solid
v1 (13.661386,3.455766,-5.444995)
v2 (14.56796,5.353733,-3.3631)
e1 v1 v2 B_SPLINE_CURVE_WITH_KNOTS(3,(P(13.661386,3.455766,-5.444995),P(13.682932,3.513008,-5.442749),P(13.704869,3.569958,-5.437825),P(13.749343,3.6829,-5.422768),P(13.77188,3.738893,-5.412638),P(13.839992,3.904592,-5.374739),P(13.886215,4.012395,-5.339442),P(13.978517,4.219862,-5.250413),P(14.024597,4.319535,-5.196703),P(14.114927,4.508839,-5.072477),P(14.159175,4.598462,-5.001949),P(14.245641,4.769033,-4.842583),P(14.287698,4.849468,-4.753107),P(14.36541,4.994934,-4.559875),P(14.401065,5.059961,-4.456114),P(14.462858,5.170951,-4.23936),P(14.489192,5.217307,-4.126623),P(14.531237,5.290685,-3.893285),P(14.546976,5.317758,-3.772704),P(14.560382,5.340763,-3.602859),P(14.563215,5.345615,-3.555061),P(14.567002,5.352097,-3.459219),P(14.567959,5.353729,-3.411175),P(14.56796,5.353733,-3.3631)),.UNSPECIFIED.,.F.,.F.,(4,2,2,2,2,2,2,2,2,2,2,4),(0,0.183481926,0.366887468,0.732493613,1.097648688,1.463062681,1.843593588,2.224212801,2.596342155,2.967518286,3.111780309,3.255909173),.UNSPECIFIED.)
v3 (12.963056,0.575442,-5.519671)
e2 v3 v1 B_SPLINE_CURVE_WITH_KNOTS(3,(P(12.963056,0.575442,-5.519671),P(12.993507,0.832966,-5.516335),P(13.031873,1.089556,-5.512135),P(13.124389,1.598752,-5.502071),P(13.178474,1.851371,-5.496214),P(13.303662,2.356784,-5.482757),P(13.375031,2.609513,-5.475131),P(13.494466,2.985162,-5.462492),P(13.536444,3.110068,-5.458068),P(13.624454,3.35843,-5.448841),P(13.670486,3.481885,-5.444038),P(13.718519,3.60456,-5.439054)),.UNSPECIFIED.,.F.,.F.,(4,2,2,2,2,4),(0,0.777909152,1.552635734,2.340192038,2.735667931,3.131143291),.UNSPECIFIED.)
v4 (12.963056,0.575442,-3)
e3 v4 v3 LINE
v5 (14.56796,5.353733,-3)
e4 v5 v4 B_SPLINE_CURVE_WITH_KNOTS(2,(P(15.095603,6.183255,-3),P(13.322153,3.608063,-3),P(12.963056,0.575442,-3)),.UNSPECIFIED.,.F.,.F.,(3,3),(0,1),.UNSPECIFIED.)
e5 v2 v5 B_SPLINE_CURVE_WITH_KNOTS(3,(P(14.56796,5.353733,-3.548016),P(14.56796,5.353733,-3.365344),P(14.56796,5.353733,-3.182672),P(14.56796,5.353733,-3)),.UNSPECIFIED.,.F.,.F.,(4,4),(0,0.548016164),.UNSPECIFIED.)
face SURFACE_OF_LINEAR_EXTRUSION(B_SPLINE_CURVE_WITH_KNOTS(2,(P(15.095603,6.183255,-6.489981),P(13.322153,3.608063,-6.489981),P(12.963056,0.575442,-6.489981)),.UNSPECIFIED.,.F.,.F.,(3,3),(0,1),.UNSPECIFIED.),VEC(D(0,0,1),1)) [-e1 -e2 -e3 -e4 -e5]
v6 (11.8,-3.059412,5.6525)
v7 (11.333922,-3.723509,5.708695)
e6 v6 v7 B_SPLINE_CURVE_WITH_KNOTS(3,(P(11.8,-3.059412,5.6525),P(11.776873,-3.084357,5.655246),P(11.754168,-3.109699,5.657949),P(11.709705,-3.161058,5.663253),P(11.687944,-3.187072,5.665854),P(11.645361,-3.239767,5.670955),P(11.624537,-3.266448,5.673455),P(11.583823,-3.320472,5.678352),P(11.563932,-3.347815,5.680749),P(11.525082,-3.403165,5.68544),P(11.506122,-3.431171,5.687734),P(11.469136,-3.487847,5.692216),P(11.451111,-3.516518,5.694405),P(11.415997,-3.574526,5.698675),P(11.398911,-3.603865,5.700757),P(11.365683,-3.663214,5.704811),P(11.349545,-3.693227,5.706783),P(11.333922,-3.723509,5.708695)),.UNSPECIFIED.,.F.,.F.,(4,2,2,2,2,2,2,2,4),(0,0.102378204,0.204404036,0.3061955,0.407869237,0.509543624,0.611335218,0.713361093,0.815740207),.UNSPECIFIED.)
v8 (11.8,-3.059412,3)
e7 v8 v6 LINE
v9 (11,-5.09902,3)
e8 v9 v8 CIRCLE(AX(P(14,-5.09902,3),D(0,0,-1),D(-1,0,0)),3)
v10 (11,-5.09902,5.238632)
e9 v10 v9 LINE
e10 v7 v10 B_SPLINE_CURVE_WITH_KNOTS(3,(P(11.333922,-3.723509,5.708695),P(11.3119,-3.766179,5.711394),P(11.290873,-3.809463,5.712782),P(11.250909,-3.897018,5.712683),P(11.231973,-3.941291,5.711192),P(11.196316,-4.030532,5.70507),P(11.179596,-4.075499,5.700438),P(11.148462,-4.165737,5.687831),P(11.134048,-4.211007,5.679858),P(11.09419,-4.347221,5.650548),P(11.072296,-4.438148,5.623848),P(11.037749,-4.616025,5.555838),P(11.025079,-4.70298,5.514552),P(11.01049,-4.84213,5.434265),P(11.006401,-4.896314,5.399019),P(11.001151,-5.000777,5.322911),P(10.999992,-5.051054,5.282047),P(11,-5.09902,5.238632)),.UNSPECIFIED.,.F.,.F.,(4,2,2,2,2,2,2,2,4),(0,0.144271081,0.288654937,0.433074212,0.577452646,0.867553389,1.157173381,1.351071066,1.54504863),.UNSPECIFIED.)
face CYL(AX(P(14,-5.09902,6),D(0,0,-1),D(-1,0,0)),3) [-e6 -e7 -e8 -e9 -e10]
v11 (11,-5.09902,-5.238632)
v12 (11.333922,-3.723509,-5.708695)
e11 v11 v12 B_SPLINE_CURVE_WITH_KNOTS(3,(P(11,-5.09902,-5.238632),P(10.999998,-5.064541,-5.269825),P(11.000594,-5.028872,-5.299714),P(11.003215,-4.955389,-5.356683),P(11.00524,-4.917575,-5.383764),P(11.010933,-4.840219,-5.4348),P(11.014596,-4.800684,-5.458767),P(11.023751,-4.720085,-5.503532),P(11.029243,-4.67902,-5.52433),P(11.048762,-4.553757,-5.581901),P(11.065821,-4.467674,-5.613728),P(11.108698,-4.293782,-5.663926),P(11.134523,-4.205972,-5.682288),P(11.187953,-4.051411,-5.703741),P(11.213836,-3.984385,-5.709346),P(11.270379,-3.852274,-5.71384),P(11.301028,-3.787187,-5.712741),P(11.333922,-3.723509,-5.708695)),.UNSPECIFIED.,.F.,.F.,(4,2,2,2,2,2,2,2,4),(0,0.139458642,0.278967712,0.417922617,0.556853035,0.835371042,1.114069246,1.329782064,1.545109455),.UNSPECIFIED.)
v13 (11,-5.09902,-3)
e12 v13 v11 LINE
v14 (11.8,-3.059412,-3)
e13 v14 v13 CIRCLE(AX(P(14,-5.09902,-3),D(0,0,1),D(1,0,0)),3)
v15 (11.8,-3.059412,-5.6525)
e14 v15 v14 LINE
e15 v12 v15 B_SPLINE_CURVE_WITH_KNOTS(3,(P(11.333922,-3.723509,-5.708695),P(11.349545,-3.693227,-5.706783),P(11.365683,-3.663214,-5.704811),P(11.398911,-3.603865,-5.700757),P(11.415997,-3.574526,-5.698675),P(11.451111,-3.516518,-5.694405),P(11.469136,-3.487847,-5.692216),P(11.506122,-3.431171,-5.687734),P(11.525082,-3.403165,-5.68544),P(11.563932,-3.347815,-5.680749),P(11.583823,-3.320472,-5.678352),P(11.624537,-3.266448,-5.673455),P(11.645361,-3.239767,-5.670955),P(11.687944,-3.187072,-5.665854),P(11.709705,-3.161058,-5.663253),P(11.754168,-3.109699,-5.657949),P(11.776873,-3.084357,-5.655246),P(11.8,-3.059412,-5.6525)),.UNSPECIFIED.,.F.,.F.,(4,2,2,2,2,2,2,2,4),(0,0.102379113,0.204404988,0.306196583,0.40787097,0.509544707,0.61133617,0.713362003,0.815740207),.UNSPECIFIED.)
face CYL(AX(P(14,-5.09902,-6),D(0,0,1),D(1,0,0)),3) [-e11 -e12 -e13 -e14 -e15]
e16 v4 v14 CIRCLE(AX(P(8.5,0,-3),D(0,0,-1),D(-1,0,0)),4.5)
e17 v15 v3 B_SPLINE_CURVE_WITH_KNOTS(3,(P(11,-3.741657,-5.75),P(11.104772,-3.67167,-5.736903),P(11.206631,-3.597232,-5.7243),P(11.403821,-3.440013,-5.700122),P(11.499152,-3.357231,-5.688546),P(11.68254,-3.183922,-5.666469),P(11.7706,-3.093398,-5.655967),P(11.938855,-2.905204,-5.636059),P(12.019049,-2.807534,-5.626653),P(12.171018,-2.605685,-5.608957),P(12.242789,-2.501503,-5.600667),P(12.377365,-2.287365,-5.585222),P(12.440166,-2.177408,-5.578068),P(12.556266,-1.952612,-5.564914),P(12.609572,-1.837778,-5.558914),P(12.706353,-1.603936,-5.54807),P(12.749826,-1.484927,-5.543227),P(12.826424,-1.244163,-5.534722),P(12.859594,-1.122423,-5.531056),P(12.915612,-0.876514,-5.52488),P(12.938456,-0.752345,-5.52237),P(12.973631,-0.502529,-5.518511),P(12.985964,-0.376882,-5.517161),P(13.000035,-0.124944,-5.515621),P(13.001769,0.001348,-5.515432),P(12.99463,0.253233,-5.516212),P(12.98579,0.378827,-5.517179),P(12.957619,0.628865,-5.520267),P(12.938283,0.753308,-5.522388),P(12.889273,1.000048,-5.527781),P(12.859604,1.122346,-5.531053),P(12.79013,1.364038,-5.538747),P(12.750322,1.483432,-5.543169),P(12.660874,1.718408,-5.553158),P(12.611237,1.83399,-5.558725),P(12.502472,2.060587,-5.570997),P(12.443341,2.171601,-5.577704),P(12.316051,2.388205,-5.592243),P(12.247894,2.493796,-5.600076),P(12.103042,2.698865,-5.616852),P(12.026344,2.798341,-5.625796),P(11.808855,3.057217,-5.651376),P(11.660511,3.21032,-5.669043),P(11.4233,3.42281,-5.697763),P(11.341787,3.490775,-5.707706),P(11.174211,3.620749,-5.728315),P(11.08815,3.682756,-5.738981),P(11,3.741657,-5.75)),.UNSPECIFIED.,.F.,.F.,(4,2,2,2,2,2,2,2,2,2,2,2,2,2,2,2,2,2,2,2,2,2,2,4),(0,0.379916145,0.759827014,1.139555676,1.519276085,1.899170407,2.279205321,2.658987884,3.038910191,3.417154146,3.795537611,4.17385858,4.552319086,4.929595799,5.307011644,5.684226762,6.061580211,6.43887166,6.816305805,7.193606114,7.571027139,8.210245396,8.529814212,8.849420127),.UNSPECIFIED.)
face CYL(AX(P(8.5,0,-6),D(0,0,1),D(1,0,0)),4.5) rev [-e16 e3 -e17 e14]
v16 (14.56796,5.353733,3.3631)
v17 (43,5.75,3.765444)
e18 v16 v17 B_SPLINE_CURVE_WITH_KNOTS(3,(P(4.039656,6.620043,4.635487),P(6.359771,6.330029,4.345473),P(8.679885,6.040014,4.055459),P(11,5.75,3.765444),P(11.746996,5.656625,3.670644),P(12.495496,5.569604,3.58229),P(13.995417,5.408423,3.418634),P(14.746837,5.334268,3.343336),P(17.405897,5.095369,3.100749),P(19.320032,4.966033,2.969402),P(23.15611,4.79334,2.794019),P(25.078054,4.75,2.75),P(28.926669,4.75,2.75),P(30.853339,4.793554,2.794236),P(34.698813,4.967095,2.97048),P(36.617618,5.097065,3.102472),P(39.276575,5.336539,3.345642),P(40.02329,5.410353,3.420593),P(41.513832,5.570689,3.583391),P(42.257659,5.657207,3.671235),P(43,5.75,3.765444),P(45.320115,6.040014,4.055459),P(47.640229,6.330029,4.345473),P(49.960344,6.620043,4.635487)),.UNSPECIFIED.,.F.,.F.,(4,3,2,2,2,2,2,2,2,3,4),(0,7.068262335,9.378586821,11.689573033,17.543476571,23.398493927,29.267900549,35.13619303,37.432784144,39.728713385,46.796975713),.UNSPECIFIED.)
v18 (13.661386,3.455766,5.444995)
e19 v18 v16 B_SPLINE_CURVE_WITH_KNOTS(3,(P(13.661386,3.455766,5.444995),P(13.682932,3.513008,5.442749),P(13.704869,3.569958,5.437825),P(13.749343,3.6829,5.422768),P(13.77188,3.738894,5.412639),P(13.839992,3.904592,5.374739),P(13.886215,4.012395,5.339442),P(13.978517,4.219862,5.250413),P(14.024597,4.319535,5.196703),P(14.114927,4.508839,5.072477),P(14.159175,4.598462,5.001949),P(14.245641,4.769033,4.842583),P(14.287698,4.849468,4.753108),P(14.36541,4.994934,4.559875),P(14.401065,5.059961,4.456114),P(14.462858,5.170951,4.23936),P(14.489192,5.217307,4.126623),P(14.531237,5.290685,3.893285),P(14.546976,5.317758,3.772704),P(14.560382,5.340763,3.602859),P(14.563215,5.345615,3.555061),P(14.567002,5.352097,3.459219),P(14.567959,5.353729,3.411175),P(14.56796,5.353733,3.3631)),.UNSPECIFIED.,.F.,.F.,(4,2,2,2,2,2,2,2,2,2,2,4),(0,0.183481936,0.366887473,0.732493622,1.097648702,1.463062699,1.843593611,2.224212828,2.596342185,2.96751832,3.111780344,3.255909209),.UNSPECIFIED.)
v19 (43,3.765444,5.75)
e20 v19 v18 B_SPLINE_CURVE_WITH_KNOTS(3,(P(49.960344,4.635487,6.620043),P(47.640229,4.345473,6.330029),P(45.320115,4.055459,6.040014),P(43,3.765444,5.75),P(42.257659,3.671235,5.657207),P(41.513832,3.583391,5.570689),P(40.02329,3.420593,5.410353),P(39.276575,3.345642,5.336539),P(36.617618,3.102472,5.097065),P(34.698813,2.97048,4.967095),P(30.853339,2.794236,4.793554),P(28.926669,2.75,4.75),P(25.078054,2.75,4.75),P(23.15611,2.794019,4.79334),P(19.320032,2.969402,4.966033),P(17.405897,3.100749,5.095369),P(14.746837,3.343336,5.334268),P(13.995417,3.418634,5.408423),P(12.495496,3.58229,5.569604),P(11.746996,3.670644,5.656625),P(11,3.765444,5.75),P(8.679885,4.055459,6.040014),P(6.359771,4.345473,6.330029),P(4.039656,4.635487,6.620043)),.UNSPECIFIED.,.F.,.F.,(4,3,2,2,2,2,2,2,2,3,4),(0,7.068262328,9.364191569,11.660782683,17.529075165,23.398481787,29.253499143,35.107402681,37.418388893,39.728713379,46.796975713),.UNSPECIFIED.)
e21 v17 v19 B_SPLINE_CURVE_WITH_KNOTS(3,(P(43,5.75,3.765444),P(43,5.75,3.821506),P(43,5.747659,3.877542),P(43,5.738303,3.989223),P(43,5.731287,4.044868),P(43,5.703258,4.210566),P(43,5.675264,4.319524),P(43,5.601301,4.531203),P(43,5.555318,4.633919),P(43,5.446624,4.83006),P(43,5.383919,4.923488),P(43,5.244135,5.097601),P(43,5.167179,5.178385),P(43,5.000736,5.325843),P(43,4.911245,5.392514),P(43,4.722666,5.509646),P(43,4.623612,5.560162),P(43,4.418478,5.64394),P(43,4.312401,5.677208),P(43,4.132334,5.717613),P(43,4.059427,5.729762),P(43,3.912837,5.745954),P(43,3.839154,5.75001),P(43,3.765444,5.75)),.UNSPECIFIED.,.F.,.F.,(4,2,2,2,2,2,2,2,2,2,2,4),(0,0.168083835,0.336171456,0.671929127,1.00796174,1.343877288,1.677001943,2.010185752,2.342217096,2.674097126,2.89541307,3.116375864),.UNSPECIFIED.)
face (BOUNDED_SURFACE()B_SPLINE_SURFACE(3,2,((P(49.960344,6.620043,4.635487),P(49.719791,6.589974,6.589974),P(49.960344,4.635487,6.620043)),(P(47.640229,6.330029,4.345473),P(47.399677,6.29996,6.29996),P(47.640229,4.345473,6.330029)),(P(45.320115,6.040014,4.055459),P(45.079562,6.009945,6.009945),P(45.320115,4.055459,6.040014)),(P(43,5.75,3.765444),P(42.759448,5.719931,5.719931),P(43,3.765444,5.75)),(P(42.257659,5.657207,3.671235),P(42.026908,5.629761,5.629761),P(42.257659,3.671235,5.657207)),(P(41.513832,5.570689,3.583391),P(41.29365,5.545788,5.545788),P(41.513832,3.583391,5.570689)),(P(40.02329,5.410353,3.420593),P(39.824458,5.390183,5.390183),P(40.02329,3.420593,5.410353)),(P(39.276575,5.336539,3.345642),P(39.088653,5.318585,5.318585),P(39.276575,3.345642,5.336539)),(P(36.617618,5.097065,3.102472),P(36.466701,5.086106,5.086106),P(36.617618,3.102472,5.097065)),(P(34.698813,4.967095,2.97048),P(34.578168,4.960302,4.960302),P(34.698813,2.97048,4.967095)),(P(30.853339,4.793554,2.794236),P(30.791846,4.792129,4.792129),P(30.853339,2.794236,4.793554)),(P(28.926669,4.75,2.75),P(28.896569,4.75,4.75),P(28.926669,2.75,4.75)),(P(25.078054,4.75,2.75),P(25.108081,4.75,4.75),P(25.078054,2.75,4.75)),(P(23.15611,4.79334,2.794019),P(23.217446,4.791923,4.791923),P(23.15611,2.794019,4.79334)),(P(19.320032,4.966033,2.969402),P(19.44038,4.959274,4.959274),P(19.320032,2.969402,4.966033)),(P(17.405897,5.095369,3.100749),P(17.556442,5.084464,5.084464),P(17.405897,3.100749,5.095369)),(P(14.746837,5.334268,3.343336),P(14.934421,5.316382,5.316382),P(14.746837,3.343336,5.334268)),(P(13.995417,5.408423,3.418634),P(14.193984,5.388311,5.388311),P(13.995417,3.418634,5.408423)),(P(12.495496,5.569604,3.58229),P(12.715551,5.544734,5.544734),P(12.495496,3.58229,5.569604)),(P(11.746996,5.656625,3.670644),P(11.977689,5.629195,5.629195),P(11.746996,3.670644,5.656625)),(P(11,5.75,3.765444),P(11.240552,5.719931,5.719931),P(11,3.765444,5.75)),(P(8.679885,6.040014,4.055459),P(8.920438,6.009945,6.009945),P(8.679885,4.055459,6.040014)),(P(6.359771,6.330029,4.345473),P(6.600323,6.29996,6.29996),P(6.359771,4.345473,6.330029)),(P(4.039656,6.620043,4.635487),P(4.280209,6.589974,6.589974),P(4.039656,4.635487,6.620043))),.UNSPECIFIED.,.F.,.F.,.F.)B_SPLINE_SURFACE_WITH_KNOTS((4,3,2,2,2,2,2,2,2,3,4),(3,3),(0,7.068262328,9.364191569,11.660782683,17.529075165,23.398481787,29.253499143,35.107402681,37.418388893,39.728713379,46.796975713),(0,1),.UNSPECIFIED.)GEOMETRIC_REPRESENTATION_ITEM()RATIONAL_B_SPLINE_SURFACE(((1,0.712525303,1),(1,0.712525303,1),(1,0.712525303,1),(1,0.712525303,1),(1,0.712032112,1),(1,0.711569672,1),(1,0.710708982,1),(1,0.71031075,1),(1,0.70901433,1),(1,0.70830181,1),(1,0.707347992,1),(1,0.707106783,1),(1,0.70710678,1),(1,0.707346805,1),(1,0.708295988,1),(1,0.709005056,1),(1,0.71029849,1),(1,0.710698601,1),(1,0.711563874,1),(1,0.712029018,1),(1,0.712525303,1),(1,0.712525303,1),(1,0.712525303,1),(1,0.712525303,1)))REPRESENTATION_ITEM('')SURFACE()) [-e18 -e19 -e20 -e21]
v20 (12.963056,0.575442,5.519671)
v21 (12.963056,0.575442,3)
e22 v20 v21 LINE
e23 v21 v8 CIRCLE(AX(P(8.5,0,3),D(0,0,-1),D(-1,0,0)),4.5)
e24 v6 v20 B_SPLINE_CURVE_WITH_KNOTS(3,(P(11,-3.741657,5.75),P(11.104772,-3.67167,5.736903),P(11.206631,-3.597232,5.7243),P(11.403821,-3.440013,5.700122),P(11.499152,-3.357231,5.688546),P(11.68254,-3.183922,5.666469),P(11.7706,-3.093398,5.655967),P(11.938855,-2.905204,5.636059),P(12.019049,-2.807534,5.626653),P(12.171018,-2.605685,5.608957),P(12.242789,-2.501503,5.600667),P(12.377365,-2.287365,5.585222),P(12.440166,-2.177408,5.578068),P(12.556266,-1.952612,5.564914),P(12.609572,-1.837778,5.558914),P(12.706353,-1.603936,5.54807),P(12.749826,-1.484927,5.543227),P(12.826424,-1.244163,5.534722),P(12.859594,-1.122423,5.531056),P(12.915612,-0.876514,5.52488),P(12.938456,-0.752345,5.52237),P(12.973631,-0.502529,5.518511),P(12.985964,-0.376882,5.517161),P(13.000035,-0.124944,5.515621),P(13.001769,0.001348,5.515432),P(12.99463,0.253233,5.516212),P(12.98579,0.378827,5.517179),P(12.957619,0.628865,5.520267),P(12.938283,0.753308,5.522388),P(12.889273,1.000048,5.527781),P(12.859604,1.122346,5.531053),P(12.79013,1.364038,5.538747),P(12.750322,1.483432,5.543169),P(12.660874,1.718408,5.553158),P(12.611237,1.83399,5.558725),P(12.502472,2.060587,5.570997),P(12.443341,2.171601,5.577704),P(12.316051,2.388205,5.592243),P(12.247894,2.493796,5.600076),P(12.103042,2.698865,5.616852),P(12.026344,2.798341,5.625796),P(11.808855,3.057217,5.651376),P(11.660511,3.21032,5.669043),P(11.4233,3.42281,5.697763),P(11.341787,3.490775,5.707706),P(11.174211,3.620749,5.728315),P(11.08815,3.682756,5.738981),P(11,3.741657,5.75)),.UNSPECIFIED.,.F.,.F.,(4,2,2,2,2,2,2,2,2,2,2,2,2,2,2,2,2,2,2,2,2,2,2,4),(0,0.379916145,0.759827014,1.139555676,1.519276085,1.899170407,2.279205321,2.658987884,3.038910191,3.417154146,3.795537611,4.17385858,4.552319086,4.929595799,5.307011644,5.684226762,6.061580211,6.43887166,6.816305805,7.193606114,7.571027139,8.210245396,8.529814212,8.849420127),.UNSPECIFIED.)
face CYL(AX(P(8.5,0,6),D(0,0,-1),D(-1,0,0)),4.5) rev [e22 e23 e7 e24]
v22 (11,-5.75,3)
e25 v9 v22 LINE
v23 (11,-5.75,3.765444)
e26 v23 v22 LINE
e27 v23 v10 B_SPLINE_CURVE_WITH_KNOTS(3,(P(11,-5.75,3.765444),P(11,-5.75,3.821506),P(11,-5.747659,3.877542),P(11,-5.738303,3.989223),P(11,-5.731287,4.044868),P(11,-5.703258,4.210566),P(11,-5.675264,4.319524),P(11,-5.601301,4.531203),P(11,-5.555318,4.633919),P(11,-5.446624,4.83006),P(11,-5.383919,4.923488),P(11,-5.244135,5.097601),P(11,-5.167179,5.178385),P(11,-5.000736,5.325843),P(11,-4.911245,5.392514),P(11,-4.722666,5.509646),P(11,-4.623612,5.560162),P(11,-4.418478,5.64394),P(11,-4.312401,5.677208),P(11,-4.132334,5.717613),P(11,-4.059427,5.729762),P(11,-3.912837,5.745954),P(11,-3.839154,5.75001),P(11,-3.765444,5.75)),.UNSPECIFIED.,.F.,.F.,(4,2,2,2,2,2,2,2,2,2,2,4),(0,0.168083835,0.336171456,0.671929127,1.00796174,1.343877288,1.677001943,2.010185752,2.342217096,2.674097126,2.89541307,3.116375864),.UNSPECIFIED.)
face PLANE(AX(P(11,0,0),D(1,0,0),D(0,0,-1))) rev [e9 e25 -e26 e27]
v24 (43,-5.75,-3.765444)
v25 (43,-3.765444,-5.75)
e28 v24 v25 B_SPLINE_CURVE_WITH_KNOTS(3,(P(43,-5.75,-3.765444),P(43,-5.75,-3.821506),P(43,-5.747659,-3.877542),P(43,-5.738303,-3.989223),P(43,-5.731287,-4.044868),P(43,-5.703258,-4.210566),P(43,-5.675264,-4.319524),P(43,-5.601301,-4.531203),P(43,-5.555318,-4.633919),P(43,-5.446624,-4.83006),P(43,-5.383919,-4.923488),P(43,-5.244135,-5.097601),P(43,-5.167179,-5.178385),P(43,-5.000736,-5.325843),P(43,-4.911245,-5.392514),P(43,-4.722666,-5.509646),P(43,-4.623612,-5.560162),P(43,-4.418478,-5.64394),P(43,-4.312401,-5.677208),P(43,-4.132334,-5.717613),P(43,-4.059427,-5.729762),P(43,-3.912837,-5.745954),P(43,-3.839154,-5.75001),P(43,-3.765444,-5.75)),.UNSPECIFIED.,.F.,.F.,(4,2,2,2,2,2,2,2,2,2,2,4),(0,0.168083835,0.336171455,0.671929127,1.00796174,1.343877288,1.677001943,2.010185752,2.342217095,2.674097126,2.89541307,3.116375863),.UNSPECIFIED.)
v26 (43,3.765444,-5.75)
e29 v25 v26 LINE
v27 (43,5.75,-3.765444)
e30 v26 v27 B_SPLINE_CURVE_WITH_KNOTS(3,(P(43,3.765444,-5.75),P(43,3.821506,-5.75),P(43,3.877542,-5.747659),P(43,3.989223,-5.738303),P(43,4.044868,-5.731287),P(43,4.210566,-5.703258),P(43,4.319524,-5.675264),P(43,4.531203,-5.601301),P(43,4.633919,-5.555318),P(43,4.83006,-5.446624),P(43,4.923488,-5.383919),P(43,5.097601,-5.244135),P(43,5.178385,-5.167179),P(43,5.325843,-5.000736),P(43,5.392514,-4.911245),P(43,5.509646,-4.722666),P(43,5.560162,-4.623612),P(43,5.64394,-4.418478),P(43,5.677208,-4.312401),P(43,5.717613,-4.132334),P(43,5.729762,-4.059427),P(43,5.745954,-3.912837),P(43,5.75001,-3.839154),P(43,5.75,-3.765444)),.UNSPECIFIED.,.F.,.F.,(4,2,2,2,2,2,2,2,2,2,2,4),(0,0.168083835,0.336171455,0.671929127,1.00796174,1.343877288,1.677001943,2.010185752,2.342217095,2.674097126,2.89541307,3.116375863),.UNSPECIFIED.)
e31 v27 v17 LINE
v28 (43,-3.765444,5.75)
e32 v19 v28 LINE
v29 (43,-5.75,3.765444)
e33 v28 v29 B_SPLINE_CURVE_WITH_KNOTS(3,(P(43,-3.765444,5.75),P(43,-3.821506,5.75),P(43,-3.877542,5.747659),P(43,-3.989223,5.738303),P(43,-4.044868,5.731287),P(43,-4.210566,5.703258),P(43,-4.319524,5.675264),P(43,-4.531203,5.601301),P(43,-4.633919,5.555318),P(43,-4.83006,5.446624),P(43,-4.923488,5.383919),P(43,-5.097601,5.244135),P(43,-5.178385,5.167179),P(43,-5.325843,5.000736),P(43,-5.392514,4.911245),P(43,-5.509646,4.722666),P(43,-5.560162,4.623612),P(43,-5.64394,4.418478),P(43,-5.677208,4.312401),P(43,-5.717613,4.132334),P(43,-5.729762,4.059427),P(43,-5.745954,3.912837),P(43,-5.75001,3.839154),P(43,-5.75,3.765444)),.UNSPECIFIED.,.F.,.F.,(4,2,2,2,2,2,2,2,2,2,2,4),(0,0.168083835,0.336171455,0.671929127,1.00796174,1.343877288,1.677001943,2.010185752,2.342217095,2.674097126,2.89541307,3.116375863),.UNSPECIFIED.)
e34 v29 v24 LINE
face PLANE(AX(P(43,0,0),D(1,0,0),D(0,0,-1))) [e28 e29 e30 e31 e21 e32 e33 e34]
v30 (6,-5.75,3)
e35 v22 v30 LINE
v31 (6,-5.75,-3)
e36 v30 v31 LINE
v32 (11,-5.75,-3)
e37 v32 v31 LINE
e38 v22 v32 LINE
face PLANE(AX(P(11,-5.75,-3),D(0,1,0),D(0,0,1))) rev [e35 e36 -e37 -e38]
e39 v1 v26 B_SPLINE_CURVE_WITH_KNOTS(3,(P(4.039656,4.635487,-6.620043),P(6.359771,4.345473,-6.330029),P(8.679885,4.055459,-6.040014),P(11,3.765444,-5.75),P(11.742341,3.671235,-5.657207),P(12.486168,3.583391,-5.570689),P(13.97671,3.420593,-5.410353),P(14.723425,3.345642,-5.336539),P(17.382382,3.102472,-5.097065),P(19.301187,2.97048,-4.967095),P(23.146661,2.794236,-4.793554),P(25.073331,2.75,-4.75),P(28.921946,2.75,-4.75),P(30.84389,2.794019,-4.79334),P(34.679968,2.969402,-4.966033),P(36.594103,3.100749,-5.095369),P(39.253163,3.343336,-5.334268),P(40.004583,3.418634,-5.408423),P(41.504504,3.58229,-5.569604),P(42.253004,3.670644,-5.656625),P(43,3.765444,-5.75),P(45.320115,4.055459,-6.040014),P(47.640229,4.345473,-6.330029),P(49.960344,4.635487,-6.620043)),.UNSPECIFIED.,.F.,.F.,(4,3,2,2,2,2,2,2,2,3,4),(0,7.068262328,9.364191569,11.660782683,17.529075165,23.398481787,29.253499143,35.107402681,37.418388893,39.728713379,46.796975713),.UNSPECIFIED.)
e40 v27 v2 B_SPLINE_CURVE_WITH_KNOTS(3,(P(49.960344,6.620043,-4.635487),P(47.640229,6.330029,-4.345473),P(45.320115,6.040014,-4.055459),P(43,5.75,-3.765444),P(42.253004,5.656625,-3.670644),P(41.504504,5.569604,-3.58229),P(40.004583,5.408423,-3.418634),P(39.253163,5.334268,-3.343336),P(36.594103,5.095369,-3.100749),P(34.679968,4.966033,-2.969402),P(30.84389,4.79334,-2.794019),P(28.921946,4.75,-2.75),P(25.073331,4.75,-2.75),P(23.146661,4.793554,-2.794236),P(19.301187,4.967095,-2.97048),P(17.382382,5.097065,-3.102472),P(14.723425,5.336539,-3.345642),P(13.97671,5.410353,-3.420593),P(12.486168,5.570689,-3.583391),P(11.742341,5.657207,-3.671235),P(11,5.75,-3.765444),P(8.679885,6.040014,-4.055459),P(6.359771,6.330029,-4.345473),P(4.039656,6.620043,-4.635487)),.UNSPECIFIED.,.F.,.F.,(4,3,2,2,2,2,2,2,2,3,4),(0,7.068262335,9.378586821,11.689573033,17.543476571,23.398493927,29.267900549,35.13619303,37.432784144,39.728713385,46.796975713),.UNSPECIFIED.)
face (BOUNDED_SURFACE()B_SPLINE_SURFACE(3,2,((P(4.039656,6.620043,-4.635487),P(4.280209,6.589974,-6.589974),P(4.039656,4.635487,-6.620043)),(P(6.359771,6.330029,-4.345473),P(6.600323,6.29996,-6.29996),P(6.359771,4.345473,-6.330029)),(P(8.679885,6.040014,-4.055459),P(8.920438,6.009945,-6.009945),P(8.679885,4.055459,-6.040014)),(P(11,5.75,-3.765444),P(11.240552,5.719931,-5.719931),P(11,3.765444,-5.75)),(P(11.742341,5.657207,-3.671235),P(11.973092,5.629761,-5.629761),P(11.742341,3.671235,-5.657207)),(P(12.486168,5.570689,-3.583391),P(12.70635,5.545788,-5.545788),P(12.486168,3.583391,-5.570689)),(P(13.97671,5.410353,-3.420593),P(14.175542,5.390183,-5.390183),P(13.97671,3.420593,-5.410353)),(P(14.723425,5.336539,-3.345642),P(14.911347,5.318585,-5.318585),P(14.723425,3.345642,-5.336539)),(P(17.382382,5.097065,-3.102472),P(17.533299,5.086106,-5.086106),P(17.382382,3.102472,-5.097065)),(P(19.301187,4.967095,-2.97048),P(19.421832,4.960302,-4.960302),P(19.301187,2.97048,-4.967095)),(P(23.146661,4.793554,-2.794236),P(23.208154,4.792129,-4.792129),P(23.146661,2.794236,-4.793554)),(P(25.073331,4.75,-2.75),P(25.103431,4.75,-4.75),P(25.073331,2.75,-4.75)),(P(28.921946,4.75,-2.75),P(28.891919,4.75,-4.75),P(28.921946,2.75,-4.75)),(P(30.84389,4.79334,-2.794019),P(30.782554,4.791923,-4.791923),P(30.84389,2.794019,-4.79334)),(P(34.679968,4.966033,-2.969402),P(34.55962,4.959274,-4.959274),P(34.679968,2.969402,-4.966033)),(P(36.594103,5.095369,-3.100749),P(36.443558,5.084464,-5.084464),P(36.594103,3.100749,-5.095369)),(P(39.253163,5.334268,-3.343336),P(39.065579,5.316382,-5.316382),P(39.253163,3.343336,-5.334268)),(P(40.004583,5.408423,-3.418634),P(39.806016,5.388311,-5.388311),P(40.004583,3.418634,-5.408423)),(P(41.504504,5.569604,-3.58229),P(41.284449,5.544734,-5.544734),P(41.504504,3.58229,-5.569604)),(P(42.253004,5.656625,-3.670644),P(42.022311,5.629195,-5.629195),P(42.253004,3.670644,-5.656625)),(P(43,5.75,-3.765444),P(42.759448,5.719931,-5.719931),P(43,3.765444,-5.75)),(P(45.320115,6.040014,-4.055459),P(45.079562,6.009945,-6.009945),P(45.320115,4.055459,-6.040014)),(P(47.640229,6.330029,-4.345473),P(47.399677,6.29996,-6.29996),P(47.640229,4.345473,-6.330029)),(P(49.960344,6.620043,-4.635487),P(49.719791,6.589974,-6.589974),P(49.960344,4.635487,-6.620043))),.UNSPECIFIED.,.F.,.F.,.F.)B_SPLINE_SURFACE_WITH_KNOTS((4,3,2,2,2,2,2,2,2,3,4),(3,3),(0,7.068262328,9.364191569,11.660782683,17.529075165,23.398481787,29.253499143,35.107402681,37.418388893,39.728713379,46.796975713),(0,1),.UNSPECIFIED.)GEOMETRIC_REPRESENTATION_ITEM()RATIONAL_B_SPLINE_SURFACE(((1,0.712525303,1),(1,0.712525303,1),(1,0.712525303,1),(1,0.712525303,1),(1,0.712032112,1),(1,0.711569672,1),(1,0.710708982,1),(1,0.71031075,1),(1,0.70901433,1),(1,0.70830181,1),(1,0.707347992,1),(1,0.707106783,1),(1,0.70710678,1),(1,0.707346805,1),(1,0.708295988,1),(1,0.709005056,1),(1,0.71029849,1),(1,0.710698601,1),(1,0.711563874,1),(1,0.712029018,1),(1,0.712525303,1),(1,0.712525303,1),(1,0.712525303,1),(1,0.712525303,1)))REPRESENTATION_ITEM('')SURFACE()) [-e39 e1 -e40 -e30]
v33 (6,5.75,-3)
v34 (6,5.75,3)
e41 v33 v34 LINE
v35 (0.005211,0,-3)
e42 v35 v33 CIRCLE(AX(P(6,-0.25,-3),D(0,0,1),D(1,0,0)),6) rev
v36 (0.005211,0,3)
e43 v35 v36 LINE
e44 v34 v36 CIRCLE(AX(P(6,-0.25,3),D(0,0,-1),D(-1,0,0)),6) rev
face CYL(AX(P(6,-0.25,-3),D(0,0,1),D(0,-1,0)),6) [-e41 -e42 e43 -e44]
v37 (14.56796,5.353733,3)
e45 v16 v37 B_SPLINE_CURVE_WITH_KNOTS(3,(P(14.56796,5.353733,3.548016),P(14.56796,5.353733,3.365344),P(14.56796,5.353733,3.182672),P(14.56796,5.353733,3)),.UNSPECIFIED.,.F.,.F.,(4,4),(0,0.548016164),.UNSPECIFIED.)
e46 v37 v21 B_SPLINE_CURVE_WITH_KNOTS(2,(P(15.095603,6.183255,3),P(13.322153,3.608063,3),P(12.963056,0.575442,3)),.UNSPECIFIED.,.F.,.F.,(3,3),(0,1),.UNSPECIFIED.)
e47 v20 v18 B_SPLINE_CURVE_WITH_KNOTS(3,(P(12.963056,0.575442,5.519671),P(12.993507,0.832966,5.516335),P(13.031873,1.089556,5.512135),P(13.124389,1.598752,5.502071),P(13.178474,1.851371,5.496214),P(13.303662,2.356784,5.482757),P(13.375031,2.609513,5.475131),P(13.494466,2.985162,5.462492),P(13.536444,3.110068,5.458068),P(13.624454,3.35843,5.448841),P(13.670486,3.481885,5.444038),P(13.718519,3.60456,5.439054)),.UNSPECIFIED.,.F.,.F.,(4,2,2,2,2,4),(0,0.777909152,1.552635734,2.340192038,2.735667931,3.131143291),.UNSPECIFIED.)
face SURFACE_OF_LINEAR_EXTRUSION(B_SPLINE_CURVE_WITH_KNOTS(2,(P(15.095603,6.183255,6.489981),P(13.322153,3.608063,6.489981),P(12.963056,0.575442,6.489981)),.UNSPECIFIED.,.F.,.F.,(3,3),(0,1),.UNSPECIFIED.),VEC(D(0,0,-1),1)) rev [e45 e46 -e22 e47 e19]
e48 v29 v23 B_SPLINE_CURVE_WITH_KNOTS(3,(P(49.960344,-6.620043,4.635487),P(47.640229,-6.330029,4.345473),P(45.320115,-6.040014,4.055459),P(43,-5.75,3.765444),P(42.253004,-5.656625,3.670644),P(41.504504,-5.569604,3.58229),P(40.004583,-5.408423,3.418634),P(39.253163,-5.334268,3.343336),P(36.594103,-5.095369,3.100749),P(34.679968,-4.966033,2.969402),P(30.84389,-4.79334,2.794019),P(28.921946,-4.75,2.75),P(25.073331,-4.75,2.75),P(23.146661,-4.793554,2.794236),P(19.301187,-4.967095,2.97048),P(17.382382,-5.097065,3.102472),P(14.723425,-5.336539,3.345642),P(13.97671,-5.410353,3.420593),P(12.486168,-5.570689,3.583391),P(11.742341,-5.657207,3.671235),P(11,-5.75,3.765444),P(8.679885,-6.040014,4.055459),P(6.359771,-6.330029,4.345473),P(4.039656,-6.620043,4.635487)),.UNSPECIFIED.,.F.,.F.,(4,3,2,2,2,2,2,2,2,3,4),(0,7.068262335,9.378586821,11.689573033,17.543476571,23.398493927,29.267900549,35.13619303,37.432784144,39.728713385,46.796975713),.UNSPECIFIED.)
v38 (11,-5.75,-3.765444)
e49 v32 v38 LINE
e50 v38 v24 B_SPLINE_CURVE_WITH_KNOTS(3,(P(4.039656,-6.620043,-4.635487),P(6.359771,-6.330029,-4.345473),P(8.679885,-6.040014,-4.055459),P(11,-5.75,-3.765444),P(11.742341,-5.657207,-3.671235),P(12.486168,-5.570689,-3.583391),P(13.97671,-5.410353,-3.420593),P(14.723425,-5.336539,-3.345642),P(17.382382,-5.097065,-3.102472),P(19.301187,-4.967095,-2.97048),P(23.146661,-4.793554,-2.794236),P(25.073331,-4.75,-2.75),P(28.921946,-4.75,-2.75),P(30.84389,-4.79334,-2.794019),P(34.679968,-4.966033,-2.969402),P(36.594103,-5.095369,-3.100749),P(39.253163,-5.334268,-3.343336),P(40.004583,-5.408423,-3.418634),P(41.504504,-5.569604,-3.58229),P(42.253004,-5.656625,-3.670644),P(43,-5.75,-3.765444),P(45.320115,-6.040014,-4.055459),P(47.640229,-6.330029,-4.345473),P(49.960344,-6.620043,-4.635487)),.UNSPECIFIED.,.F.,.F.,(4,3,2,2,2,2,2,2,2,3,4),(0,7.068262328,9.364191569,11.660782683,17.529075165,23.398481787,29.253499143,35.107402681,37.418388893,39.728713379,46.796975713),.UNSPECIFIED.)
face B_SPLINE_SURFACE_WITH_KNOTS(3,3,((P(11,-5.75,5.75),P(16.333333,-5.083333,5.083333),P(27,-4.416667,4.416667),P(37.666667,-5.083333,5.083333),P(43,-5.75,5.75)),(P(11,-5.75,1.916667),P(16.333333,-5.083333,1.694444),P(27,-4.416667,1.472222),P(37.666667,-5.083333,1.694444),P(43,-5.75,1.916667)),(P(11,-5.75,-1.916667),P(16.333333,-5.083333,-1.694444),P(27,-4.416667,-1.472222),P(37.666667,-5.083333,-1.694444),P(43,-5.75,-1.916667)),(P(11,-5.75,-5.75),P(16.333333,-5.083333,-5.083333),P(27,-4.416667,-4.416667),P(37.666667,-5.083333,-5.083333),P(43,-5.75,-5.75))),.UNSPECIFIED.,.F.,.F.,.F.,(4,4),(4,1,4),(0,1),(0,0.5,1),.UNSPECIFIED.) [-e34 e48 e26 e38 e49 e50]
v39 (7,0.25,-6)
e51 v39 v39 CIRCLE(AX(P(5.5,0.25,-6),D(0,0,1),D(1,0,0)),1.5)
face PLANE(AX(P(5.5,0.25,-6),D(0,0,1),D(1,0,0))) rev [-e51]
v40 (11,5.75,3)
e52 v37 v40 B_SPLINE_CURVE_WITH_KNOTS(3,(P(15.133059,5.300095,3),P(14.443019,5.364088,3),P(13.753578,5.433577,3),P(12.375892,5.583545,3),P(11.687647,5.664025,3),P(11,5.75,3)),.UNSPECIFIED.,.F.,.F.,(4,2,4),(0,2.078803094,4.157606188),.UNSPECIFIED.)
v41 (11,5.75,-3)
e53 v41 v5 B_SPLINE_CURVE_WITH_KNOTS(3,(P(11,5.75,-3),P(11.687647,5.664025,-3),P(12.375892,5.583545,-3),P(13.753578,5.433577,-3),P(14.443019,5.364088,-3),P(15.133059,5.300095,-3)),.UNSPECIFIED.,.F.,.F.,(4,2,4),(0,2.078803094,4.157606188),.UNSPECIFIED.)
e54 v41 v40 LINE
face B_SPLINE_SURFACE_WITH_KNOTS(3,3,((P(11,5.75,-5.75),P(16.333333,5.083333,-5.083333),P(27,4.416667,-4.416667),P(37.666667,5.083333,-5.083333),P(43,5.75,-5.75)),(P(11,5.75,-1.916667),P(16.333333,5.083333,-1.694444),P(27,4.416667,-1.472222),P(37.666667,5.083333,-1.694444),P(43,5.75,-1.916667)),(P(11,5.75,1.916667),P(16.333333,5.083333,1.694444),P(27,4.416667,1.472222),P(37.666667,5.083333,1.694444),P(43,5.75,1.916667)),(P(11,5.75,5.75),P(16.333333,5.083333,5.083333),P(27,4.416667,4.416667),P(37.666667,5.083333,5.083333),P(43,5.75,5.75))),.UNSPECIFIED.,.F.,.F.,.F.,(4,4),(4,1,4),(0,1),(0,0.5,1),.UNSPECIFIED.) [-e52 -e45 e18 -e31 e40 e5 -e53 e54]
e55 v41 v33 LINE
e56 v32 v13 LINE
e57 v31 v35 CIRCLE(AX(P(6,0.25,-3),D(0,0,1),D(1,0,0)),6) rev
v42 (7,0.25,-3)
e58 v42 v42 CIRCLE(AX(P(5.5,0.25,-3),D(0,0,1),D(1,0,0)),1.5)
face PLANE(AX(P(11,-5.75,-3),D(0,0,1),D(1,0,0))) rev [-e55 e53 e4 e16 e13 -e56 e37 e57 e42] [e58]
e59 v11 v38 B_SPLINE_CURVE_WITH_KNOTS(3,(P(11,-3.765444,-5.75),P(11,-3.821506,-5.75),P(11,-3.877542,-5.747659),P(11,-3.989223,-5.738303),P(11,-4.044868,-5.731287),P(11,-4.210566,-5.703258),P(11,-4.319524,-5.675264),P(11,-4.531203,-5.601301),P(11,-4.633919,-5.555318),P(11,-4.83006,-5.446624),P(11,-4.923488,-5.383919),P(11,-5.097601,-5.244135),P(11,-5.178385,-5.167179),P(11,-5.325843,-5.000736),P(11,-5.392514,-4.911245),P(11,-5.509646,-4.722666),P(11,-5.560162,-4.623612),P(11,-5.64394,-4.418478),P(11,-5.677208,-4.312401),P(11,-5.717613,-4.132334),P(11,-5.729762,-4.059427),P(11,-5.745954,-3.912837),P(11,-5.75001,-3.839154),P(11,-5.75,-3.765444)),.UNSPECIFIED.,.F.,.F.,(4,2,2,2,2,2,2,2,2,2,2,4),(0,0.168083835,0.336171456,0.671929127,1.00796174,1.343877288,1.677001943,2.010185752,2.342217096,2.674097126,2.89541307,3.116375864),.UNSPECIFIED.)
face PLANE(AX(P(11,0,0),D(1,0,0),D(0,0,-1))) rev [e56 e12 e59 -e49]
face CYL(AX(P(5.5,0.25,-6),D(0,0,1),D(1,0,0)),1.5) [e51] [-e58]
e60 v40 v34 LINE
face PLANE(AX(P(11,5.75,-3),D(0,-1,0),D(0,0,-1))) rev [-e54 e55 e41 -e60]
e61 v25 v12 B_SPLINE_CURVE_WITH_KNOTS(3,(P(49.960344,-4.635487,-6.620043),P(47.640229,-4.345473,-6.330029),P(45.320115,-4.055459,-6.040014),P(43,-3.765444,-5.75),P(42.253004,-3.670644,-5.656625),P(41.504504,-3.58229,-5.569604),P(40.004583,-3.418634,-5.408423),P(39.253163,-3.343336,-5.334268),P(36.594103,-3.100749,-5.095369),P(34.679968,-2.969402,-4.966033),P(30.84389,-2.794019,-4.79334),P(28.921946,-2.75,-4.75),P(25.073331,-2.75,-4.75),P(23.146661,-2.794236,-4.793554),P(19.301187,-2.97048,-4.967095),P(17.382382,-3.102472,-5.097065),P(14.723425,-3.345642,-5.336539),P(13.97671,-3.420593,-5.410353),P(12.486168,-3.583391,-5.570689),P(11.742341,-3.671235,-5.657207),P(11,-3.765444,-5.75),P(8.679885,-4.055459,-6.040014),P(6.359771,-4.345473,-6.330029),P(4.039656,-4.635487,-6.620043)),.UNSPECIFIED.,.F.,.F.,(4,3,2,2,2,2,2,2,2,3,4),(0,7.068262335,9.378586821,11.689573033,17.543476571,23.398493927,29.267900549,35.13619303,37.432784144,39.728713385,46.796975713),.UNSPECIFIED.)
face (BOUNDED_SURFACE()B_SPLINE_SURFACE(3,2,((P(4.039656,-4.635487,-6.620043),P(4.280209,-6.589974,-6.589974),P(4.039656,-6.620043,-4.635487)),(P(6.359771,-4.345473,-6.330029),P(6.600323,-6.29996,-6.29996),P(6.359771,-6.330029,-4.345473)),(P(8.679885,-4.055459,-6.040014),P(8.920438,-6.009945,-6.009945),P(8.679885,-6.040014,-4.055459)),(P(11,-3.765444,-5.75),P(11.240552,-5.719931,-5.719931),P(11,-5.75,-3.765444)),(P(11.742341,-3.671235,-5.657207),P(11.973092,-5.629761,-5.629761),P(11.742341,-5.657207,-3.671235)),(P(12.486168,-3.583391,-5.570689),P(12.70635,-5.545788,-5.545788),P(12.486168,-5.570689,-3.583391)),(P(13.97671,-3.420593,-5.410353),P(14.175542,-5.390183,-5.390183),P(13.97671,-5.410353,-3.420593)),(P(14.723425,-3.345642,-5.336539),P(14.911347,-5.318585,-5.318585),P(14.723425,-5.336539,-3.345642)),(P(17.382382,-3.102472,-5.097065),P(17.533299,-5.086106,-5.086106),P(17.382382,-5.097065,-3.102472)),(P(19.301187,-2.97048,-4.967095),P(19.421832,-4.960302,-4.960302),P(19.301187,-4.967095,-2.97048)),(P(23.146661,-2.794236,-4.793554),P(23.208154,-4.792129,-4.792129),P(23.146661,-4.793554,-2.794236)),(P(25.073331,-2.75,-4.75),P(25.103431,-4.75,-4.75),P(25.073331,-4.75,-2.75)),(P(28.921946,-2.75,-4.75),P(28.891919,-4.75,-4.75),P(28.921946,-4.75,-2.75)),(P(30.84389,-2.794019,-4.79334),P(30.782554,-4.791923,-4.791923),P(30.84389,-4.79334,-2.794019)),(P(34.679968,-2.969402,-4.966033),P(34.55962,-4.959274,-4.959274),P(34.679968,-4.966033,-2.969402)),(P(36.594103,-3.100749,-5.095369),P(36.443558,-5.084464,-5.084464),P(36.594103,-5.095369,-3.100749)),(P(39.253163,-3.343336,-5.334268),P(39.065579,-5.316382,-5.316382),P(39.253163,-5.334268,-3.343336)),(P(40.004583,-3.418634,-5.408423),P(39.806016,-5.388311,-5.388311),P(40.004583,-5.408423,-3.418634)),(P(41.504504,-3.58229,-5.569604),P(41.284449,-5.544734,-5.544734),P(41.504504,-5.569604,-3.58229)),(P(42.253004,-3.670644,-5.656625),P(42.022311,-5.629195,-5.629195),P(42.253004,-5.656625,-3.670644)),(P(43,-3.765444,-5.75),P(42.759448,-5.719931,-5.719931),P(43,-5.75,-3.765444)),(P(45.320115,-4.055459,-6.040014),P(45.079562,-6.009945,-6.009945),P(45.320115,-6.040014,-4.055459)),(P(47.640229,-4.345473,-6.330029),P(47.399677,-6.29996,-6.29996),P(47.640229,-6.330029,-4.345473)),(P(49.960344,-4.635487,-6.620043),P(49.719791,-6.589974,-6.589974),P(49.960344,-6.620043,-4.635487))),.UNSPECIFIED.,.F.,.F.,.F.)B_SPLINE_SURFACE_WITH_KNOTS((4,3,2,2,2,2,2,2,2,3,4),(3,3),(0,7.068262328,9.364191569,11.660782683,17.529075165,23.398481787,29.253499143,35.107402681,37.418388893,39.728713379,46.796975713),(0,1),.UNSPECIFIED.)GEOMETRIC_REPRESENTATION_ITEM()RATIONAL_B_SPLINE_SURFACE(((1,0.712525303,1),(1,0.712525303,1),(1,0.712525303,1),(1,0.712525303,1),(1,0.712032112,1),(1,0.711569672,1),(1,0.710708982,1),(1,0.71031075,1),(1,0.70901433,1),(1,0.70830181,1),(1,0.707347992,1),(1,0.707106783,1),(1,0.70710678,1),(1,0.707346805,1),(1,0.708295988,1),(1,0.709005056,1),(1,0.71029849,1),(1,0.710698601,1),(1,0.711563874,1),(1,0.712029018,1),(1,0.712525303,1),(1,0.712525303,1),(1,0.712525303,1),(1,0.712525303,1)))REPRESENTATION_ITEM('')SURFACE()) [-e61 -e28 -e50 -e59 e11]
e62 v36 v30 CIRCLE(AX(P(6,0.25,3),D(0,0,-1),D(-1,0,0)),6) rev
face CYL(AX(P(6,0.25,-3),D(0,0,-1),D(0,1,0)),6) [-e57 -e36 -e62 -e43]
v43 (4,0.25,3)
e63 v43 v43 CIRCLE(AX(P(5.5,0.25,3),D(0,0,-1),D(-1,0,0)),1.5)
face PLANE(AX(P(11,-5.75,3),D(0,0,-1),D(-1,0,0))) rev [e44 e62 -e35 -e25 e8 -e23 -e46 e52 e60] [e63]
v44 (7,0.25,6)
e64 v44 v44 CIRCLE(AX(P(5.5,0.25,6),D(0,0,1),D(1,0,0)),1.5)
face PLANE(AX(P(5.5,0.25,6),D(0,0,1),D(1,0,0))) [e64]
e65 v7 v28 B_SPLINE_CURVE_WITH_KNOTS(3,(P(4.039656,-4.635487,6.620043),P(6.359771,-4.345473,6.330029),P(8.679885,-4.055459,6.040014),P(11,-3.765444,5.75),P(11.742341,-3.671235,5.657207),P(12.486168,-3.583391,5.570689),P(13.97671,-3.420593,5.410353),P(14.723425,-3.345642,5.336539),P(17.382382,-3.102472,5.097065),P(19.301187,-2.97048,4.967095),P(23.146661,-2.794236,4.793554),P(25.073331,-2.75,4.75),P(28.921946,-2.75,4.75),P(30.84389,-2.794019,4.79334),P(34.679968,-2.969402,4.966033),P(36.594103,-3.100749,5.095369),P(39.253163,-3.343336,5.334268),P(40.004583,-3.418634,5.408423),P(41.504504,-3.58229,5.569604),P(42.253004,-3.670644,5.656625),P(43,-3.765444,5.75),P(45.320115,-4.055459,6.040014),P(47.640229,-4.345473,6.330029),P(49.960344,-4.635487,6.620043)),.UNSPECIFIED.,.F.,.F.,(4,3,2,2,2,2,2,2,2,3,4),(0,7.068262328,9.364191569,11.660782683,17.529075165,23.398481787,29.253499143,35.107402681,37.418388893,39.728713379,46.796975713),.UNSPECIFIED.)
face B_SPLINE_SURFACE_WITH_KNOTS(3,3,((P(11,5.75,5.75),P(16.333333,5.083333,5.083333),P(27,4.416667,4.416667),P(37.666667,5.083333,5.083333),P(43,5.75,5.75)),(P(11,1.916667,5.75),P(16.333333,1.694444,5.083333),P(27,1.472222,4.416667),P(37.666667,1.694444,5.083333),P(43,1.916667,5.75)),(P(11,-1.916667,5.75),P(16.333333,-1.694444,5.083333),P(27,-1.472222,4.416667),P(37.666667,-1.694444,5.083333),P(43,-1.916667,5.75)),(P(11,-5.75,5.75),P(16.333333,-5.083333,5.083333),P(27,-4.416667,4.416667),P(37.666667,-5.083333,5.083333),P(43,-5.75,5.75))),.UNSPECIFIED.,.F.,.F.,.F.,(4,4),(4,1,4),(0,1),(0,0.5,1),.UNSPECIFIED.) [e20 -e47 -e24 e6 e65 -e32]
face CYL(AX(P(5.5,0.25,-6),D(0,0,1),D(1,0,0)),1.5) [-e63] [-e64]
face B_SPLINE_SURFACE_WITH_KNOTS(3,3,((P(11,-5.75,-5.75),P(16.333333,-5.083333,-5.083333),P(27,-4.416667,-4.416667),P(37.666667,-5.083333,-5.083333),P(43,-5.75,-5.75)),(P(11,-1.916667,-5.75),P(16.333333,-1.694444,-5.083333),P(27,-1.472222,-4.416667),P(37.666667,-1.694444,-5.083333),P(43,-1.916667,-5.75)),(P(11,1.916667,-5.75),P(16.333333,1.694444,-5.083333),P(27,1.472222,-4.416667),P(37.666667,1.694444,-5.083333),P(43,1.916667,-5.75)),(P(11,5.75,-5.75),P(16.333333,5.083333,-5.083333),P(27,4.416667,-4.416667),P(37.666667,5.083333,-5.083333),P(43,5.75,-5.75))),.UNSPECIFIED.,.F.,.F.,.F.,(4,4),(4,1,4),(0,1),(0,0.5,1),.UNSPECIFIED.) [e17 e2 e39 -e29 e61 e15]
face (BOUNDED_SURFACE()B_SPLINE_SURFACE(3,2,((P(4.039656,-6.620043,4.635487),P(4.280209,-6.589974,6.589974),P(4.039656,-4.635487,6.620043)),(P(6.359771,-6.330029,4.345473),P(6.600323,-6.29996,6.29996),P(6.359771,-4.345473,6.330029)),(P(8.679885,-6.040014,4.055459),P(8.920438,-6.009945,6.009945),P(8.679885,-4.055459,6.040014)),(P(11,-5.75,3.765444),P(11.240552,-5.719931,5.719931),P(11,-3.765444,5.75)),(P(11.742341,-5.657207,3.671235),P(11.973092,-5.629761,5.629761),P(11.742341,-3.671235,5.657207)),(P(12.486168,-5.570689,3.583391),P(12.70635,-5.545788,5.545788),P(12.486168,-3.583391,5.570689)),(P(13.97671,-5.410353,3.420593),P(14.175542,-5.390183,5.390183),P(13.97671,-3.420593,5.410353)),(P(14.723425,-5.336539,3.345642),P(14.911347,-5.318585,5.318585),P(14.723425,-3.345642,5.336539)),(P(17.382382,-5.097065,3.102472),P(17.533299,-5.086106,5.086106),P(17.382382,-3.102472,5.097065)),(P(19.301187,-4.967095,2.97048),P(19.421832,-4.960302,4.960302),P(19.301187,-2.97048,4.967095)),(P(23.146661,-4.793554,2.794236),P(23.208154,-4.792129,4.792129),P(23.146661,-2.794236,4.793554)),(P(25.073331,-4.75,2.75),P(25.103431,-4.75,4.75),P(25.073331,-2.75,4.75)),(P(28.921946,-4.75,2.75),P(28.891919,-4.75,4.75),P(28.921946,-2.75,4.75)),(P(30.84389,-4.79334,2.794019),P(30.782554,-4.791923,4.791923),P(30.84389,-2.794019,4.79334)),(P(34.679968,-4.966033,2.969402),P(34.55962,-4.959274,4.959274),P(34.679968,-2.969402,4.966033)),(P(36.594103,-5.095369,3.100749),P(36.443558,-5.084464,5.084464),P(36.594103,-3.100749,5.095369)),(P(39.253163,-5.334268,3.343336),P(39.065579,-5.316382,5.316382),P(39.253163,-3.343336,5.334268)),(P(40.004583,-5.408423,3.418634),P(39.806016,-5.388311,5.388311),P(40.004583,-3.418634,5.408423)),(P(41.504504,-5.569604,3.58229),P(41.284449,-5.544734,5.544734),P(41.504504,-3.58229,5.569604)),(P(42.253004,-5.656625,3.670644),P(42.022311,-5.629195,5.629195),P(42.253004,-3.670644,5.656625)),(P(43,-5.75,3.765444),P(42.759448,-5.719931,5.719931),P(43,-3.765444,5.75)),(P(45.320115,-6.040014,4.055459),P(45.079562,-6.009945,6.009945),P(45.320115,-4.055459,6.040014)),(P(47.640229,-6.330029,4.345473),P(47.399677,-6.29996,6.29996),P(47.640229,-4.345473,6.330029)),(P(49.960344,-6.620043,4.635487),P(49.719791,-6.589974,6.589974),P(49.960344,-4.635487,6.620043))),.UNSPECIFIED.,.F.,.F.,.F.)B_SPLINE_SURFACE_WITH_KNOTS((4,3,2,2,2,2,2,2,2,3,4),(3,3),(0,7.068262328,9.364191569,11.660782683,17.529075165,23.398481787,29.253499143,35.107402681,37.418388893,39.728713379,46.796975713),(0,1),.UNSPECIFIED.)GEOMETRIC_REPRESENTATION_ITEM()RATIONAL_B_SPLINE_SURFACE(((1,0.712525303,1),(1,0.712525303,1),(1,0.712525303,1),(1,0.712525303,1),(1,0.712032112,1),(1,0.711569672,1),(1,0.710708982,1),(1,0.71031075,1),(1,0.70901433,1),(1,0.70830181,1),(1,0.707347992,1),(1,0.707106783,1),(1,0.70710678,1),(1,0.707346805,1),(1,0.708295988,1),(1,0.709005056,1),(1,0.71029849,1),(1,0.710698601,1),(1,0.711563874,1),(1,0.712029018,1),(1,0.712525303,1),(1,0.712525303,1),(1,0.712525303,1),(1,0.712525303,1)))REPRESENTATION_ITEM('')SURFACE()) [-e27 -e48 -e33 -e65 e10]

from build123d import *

# Parameters (mm, degrees)
SKETCH1_W                = 6
SKETCH1_H                = 11.5
BOSS_EXTRUDE1_DEPTH      = 11
BOSS_EXTRUDE2_DEPTH      = 3
BOSS_EXTRUDE2_DEPTH_BACK = 9
SKETCH2_R                = 1.5
FILLET2_R                = 2
CUT_EXTRUDE4_DEPTH       = 3
FILLET8_R                = 3
CUT_EXTRUDE7_DEPTH       = 45.306461264
FILLET9_R                = 6


with BuildPart() as part:
    # Sketch1 → Boss-Extrude1 (new body)
    with BuildSketch(Plane(origin=(0, 0, 0), x_dir=(0, 0, -1), z_dir=(1, 0, 0))):
        Rectangle(SKETCH1_W, SKETCH1_H)
    extrude(amount=BOSS_EXTRUDE1_DEPTH)

    # Sketch2 → Boss-Extrude2 (add, two sides: drawn at the far end of the back side and taken through both)
    with BuildSketch(Plane.XY.offset(3).offset(-BOSS_EXTRUDE2_DEPTH_BACK)):
        with Locations((5.5, 0.25)):
            Circle(SKETCH2_R)
    extrude(amount=BOSS_EXTRUDE2_DEPTH + BOSS_EXTRUDE2_DEPTH_BACK)

    # Sketch3 → Loft1 section 0
    with BuildSketch(Plane(origin=(11, 0, 0), x_dir=(0, 0, -1), z_dir=(1, 0, 0))):
        with BuildLine():
            Line((5.75, -5.75), (-5.75, -5.75))
            Line((-5.75, -5.75), (-5.75, 5.75))
            Line((-5.75, 5.75), (5.75, 5.75))
            Line((5.75, 5.75), (5.75, -5.75))
        make_face()
    # Sketch4 → Loft1 section 1
    with BuildSketch(Plane(origin=(27, 0, 0), x_dir=(0, 0, -1), z_dir=(1, 0, 0))):
        with BuildLine():
            Line((4.75, -4.75), (-4.75, -4.75))
            Line((-4.75, -4.75), (-4.75, 4.75))
            Line((-4.75, 4.75), (4.75, 4.75))
            Line((4.75, 4.75), (4.75, -4.75))
        make_face()
    # Sketch5 → Loft1 section 2
    with BuildSketch(Plane(origin=(43, 0, 0), x_dir=(0, 0, -1), z_dir=(1, 0, 0))):
        with BuildLine():
            Line((5.75, -5.75), (-5.75, -5.75))
            Line((-5.75, -5.75), (-5.75, 5.75))
            Line((-5.75, 5.75), (5.75, 5.75))
            Line((5.75, 5.75), (5.75, -5.75))
        make_face()
    loft()

    # Fillet2
    fillet2_edges = [part.edges().sort_by_distance(p)[0] for p in [
        (27, 4.75, -4.75),
        (27, -4.75, -4.75),
        (27, -4.75, 4.75),
        (27, 4.75, 4.75),
    ]]
    fillet(fillet2_edges, radius=FILLET2_R)

    # Sketch11 → Cut-Extrude4 (cut)
    with BuildSketch(Plane(origin=(0, 0, -3), x_dir=(-1, 0, 0), z_dir=(0, 0, -1))):
        with BuildLine():
            Line((-8.5, 4.5), (-8.5, -4.5))
            ThreePointArc((-8.5, -4.5), (-13, 0), (-8.5, 4.5))
        make_face()
    cut_extrude4 = extrude(amount=CUT_EXTRUDE4_DEPTH, mode=Mode.SUBTRACT)

    # Mirror2: Cut-Extrude4 across plane
    add(cut_extrude4.mirror(Plane.XY), mode=Mode.SUBTRACT)

    # Fillet8
    fillet8_edges = [part.edges().sort_by_distance(p)[0] for p in [
        (11, 3.741657387, 4.375),
        (11, -3.741657387, 4.375),
        (11, 3.741657387, -4.375),
        (11, -3.741657387, -4.375),
    ]]
    fillet(fillet8_edges, radius=FILLET8_R)

    # Sketch14 → Cut-Extrude7 (cut, through all)
    with BuildSketch(Plane(origin=(0, 0, -3), x_dir=(-1, 0, 0), z_dir=(0, 0, -1))):
        with BuildLine():
            Line((-8.853025193, 6.183254842), (-15.095603268, 6.183254842))
            add(Edge.make_bspline(
                [(-12.96305568, 0.575442436), (-13.32215255, 3.608062735), (-15.095603268, 6.183254842)],
                knots=[0, 0, 0, 1, 1, 1], degree=2))
            Line((-12.96305568, 0.575442436), (-8.853025193, 6.183254842))
        make_face()
    cut_extrude7 = extrude(amount=CUT_EXTRUDE7_DEPTH, mode=Mode.SUBTRACT)

    # Mirror3: Cut-Extrude7 across plane
    add(cut_extrude7.mirror(Plane.XY), mode=Mode.SUBTRACT)

    # Fillet9
    # the kernel refuses this fillet: 6 mm, written as the material it takes off along each edge
    with BuildSketch(Plane(origin=(0, 5.75, 18), x_dir=(0, -1, 0), z_dir=(0, 0, -1))) as fillet9_piece_1:
        with BuildLine():
            CenterArc((FILLET9_R, -FILLET9_R), FILLET9_R, 90, 90)
            Line((0, -FILLET9_R), (0, 0))
            Line((0, 0), (FILLET9_R, 0))
        make_face()
    extrude(amount=36, mode=Mode.SUBTRACT)
    with BuildSketch(Plane(origin=(0, -5.75, -18), x_dir=(1, 0, 0), z_dir=(0, 0, 1))) as fillet9_piece_2:
        with BuildLine():
            CenterArc((FILLET9_R, FILLET9_R), FILLET9_R, 180, 90)
            Line((0, FILLET9_R), (0, 0))
            Line((0, 0), (FILLET9_R, 0))
        make_face()
    extrude(amount=36, mode=Mode.SUBTRACT)


solid = part.part
